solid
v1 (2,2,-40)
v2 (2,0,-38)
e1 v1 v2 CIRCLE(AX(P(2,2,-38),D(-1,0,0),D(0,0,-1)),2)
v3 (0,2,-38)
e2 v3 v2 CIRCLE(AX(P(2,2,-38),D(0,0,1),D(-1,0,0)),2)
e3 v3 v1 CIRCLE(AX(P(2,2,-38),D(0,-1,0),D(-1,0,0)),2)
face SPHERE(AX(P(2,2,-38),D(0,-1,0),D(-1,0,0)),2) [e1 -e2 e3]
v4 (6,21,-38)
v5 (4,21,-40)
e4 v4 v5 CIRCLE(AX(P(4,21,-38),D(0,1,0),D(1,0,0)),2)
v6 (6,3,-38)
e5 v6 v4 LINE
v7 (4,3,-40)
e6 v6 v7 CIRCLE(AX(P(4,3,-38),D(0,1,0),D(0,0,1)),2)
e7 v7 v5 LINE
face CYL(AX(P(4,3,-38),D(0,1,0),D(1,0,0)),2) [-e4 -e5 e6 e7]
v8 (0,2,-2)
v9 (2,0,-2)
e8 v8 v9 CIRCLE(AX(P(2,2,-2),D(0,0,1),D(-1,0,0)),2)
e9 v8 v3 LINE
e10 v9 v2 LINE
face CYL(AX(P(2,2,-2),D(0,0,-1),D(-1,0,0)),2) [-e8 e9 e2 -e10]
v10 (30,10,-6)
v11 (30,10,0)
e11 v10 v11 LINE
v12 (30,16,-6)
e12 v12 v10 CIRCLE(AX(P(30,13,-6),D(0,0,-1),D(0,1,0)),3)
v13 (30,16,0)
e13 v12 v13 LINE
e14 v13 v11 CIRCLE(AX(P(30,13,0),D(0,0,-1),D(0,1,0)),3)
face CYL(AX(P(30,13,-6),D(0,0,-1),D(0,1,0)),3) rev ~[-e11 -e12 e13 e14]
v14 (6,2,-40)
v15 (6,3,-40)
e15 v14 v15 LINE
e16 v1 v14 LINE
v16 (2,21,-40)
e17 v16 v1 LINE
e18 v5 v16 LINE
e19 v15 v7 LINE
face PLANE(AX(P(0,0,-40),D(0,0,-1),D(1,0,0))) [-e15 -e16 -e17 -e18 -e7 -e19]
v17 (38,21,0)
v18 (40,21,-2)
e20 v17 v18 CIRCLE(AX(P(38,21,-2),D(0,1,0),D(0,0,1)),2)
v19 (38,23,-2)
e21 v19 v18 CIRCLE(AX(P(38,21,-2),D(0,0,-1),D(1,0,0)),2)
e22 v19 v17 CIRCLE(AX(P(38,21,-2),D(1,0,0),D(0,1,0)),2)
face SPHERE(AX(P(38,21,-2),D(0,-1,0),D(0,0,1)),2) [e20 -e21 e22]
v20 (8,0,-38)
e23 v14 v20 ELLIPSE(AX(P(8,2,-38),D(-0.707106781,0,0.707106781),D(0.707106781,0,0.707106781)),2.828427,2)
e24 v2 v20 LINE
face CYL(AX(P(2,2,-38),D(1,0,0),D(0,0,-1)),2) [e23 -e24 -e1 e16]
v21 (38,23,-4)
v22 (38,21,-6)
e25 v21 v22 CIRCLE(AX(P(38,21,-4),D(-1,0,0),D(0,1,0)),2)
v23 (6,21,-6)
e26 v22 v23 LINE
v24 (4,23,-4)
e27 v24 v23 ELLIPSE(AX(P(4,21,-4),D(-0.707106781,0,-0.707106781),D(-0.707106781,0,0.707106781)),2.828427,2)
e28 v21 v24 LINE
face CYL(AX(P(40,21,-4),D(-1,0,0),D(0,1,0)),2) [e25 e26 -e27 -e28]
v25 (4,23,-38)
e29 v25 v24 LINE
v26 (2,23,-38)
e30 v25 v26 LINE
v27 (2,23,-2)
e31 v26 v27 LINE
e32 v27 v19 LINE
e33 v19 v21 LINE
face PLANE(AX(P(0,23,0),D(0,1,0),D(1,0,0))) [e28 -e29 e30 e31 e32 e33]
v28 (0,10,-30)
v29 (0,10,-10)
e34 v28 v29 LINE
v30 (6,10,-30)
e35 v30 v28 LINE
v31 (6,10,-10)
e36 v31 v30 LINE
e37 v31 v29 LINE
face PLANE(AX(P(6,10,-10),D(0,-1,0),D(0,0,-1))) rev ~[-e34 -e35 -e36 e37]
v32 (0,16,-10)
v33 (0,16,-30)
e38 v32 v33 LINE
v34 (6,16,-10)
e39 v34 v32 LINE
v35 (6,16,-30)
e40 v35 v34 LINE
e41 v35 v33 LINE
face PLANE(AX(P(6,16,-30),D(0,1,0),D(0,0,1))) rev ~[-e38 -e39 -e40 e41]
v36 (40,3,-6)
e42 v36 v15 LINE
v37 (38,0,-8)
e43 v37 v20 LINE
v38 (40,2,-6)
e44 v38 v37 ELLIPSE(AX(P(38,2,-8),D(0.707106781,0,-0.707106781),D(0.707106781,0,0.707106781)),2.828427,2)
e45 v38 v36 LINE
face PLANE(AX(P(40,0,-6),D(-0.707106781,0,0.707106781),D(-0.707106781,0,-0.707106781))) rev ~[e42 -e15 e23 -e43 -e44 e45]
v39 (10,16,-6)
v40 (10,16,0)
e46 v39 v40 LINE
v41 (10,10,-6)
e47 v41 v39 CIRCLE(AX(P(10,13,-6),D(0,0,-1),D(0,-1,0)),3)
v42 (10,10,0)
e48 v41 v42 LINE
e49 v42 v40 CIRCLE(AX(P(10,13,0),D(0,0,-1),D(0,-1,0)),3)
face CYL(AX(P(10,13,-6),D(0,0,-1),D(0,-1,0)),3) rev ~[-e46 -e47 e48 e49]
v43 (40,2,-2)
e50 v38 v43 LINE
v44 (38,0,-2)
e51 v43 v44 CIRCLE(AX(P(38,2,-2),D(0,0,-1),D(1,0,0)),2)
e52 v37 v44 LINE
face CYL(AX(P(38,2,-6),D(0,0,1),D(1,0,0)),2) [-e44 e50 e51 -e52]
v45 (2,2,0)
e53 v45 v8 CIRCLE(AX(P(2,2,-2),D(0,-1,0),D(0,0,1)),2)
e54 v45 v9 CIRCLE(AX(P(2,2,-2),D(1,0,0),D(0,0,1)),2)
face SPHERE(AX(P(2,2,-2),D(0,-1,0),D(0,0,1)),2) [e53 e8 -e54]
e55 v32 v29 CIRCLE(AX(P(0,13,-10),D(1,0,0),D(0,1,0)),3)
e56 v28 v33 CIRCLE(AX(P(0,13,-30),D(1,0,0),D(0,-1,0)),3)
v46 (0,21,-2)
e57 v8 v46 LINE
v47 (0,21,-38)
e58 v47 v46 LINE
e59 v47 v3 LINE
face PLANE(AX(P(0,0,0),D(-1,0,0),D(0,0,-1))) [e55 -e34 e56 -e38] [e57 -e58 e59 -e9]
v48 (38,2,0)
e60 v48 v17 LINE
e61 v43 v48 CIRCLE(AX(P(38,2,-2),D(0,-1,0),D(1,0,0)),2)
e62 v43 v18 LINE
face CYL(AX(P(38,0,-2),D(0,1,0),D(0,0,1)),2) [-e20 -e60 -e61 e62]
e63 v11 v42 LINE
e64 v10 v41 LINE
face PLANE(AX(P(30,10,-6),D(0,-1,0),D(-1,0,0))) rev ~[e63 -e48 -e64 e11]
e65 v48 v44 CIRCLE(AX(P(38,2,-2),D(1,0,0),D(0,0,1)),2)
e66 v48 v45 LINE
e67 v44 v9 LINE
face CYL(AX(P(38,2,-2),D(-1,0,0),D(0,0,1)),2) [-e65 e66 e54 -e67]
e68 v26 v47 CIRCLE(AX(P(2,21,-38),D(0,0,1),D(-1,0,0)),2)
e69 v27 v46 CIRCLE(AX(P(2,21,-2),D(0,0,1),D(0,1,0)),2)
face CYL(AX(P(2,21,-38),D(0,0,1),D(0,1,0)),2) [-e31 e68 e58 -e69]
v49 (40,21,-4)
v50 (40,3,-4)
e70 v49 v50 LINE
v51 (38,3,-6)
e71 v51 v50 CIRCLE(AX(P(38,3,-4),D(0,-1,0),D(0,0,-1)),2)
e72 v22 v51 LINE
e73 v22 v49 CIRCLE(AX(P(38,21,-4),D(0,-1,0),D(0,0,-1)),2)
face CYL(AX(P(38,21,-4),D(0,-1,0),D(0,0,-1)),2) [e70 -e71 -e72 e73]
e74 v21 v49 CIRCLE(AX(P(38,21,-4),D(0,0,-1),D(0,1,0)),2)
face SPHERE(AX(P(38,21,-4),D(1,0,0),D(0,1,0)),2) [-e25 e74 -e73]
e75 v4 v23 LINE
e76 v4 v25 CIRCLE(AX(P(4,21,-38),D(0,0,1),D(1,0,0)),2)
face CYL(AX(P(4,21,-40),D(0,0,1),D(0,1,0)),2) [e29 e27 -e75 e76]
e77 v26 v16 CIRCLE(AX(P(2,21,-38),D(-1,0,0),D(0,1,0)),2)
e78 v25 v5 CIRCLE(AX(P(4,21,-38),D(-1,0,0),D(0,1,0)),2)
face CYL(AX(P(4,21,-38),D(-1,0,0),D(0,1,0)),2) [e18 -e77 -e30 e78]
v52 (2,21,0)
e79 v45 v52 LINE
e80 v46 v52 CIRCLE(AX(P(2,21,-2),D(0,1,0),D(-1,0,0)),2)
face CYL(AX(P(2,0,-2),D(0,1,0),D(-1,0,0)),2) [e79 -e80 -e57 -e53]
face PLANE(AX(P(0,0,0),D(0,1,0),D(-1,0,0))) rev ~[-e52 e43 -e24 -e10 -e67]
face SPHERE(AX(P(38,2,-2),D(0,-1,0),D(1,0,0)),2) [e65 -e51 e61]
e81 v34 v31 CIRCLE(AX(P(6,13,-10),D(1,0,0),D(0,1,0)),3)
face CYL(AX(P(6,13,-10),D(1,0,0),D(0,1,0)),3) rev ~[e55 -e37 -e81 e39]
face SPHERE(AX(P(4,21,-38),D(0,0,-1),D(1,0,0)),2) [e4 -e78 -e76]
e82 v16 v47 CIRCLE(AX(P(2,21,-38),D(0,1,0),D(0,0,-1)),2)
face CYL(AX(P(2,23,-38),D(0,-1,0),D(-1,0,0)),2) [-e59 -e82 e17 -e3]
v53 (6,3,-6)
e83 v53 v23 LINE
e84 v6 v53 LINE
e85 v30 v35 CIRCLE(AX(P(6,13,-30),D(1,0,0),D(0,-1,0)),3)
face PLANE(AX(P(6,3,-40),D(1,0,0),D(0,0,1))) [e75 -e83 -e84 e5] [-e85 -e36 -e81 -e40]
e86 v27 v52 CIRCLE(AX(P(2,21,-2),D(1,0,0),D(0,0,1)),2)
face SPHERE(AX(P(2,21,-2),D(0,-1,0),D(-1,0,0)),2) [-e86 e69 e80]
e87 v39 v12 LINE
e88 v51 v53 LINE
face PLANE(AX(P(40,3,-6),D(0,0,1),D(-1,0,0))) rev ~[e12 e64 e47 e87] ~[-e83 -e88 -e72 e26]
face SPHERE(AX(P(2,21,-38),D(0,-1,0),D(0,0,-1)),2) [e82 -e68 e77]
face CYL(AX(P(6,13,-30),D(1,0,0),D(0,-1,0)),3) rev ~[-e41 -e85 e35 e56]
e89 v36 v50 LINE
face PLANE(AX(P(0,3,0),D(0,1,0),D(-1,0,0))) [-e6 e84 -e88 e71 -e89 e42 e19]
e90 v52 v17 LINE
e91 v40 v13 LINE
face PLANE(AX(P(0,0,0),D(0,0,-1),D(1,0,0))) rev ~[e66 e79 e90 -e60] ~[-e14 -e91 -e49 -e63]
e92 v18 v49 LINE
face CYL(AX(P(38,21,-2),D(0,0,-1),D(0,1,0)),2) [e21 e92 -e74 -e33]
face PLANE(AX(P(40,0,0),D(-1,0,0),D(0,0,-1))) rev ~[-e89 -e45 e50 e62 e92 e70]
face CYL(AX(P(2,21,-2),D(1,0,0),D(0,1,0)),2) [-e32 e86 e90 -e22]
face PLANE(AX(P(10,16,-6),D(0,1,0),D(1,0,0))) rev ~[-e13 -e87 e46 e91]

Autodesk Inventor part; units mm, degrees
ref_plane "YZ Plane" through (0, 0, 0) normal (1, 0, 0) x (0, 1, 0)
ref_plane "XZ Plane" through (0, 0, 0) normal (0, 1, 0) x (-1, 0, 0)
ref_plane "XY Plane" through (0, 0, 0) normal (0, 0, 1) x (1, 0, 0)
sketch "Sketch1" plane through (0, 0, 0) normal (0, 1, 0) x (-1, 0, 0)
  line L0 (0, 0) -> (0, -40)
  line L1 (0, 0) -> (40, 0) construction
  line L2 (0, 0) -> (-40, 0)
  line L3 (-6, -40) -> (-6, -6)
  line L4 (-6, -6) -> (-40, -6)
  line L5 (-40, 0) -> (-40, -6)
  line L6 (0, -40) -> (-6, -40)
  line L7 (-40, -6) -> (-6, -40)
  dimension "d0" = 40
  dimension "d1" = 90
  dimension "d2" = 40
  dimension "d3" = 6
extrude "Extrusion1" add sketch "Sketch1" along normal blind 3
sketch "Sketch2" plane through (0, 3, 0) normal (0, 1, 0) x (1, 0, 0)
  line L0 (0, 40) -> (0, 0) projected
  line L1 (0, 0) -> (0, 40)
  line L2 (0, 0) -> (40, 0) projected
  line L3 (40, 0) -> (0, 0)
  line L4 (6, 40) -> (6, 0)
  line L5 (40, 6) -> (6, 6)
  line L6 (40, 6) -> (6, 40) projected
  line L7 (40, 6) -> (40, 0)
  line L8 (6, 40) -> (0, 40)
  dimension "d6" = 6
extrude "Extrusion2" add sketch "Sketch2" along normal blind 20 contours L8 L4 L2 L0 | L4 L5 L7 L2
sketch "Sketch3" plane through (6, 3, -6) normal (1, 0, 0) x (0, 0, -1)
  line L0 (34, 20) -> (-6, 20) projected
  line L1 (-6, 20) -> (4, 20)
  line L2 (4, 20) -> (4, 10)
  line L3 (4, 10) -> (24, 10) construction
  line L4 (4, 7) -> (24, 7)
  line L5 (24, 13) -> (4, 13)
  arc A0 (4, 13) -> (4, 7) centre (4, 10) ccw
  arc A1 (24, 7) -> (24, 13) centre (24, 10) ccw
  point P0 (-6, -3)
  point P1 (14, 10)
  dimension "d9" = 10
  dimension "d10" = 10
  dimension "d11" = 20
  dimension "d12" = 6
extrude "Extrusion3" cut sketch "Sketch3" against normal blind 20
sketch "Sketch4" plane through (40, 3, -6) normal (0, 0, -1) x (-1, 0, 0)
  line L0 (10, 20) -> (10, 10)
  line L1 (10, 10) -> (30, 10) construction
  line L2 (10, 7) -> (30, 7)
  line L3 (30, 13) -> (10, 13)
  arc A0 (10, 13) -> (10, 7) centre (10, 10) ccw
  arc A1 (30, 7) -> (30, 13) centre (30, 10) ccw
  line L4 (40, -3) -> (40, 20) projected
  line L5 (0, 20) -> (34, 20) projected
  point P0 (20, 10)
  dimension "d16" = 10
  dimension "d17" = 20
  dimension "d18" = 6
  dimension "d35" = 10
  dimension "d36" = 13
extrude "Extrusion4" cut sketch "Sketch4" against normal blind 20
fillet "Fillet1" radius 2 3 edges at (0, 11.5, 0) (40, 11.5, 0) (0, 11.5, -40)
fillet "Fillet2" radius 2 2 edges at (23, 23, -6) (6, 23, -23)
fillet "Fillet3" radius 2 11 edges at (39.4142, 23, -0.5858) (40, 23, -3) (40, 22.4142, -5.4142) (40, 12, -6) (0.5858, 23, -0.5858) (0, 23, -20) (0.5858, 23, -39.4142) (3, 23, -40) (5.4142, 22.4142, -40) (6, 12, -40) (20, 23, 0)
fillet "Fillet4" radius 2 7 edges at (0.5858, 0, -39.4142) (4, 0, -40) (0.5858, 0, -0.5858) (20, 0, 0) (39.4142, 0, -0.5858) (40, 0, -4) (0, 0, -20)
properties part number "RightAngle_Bracket"
